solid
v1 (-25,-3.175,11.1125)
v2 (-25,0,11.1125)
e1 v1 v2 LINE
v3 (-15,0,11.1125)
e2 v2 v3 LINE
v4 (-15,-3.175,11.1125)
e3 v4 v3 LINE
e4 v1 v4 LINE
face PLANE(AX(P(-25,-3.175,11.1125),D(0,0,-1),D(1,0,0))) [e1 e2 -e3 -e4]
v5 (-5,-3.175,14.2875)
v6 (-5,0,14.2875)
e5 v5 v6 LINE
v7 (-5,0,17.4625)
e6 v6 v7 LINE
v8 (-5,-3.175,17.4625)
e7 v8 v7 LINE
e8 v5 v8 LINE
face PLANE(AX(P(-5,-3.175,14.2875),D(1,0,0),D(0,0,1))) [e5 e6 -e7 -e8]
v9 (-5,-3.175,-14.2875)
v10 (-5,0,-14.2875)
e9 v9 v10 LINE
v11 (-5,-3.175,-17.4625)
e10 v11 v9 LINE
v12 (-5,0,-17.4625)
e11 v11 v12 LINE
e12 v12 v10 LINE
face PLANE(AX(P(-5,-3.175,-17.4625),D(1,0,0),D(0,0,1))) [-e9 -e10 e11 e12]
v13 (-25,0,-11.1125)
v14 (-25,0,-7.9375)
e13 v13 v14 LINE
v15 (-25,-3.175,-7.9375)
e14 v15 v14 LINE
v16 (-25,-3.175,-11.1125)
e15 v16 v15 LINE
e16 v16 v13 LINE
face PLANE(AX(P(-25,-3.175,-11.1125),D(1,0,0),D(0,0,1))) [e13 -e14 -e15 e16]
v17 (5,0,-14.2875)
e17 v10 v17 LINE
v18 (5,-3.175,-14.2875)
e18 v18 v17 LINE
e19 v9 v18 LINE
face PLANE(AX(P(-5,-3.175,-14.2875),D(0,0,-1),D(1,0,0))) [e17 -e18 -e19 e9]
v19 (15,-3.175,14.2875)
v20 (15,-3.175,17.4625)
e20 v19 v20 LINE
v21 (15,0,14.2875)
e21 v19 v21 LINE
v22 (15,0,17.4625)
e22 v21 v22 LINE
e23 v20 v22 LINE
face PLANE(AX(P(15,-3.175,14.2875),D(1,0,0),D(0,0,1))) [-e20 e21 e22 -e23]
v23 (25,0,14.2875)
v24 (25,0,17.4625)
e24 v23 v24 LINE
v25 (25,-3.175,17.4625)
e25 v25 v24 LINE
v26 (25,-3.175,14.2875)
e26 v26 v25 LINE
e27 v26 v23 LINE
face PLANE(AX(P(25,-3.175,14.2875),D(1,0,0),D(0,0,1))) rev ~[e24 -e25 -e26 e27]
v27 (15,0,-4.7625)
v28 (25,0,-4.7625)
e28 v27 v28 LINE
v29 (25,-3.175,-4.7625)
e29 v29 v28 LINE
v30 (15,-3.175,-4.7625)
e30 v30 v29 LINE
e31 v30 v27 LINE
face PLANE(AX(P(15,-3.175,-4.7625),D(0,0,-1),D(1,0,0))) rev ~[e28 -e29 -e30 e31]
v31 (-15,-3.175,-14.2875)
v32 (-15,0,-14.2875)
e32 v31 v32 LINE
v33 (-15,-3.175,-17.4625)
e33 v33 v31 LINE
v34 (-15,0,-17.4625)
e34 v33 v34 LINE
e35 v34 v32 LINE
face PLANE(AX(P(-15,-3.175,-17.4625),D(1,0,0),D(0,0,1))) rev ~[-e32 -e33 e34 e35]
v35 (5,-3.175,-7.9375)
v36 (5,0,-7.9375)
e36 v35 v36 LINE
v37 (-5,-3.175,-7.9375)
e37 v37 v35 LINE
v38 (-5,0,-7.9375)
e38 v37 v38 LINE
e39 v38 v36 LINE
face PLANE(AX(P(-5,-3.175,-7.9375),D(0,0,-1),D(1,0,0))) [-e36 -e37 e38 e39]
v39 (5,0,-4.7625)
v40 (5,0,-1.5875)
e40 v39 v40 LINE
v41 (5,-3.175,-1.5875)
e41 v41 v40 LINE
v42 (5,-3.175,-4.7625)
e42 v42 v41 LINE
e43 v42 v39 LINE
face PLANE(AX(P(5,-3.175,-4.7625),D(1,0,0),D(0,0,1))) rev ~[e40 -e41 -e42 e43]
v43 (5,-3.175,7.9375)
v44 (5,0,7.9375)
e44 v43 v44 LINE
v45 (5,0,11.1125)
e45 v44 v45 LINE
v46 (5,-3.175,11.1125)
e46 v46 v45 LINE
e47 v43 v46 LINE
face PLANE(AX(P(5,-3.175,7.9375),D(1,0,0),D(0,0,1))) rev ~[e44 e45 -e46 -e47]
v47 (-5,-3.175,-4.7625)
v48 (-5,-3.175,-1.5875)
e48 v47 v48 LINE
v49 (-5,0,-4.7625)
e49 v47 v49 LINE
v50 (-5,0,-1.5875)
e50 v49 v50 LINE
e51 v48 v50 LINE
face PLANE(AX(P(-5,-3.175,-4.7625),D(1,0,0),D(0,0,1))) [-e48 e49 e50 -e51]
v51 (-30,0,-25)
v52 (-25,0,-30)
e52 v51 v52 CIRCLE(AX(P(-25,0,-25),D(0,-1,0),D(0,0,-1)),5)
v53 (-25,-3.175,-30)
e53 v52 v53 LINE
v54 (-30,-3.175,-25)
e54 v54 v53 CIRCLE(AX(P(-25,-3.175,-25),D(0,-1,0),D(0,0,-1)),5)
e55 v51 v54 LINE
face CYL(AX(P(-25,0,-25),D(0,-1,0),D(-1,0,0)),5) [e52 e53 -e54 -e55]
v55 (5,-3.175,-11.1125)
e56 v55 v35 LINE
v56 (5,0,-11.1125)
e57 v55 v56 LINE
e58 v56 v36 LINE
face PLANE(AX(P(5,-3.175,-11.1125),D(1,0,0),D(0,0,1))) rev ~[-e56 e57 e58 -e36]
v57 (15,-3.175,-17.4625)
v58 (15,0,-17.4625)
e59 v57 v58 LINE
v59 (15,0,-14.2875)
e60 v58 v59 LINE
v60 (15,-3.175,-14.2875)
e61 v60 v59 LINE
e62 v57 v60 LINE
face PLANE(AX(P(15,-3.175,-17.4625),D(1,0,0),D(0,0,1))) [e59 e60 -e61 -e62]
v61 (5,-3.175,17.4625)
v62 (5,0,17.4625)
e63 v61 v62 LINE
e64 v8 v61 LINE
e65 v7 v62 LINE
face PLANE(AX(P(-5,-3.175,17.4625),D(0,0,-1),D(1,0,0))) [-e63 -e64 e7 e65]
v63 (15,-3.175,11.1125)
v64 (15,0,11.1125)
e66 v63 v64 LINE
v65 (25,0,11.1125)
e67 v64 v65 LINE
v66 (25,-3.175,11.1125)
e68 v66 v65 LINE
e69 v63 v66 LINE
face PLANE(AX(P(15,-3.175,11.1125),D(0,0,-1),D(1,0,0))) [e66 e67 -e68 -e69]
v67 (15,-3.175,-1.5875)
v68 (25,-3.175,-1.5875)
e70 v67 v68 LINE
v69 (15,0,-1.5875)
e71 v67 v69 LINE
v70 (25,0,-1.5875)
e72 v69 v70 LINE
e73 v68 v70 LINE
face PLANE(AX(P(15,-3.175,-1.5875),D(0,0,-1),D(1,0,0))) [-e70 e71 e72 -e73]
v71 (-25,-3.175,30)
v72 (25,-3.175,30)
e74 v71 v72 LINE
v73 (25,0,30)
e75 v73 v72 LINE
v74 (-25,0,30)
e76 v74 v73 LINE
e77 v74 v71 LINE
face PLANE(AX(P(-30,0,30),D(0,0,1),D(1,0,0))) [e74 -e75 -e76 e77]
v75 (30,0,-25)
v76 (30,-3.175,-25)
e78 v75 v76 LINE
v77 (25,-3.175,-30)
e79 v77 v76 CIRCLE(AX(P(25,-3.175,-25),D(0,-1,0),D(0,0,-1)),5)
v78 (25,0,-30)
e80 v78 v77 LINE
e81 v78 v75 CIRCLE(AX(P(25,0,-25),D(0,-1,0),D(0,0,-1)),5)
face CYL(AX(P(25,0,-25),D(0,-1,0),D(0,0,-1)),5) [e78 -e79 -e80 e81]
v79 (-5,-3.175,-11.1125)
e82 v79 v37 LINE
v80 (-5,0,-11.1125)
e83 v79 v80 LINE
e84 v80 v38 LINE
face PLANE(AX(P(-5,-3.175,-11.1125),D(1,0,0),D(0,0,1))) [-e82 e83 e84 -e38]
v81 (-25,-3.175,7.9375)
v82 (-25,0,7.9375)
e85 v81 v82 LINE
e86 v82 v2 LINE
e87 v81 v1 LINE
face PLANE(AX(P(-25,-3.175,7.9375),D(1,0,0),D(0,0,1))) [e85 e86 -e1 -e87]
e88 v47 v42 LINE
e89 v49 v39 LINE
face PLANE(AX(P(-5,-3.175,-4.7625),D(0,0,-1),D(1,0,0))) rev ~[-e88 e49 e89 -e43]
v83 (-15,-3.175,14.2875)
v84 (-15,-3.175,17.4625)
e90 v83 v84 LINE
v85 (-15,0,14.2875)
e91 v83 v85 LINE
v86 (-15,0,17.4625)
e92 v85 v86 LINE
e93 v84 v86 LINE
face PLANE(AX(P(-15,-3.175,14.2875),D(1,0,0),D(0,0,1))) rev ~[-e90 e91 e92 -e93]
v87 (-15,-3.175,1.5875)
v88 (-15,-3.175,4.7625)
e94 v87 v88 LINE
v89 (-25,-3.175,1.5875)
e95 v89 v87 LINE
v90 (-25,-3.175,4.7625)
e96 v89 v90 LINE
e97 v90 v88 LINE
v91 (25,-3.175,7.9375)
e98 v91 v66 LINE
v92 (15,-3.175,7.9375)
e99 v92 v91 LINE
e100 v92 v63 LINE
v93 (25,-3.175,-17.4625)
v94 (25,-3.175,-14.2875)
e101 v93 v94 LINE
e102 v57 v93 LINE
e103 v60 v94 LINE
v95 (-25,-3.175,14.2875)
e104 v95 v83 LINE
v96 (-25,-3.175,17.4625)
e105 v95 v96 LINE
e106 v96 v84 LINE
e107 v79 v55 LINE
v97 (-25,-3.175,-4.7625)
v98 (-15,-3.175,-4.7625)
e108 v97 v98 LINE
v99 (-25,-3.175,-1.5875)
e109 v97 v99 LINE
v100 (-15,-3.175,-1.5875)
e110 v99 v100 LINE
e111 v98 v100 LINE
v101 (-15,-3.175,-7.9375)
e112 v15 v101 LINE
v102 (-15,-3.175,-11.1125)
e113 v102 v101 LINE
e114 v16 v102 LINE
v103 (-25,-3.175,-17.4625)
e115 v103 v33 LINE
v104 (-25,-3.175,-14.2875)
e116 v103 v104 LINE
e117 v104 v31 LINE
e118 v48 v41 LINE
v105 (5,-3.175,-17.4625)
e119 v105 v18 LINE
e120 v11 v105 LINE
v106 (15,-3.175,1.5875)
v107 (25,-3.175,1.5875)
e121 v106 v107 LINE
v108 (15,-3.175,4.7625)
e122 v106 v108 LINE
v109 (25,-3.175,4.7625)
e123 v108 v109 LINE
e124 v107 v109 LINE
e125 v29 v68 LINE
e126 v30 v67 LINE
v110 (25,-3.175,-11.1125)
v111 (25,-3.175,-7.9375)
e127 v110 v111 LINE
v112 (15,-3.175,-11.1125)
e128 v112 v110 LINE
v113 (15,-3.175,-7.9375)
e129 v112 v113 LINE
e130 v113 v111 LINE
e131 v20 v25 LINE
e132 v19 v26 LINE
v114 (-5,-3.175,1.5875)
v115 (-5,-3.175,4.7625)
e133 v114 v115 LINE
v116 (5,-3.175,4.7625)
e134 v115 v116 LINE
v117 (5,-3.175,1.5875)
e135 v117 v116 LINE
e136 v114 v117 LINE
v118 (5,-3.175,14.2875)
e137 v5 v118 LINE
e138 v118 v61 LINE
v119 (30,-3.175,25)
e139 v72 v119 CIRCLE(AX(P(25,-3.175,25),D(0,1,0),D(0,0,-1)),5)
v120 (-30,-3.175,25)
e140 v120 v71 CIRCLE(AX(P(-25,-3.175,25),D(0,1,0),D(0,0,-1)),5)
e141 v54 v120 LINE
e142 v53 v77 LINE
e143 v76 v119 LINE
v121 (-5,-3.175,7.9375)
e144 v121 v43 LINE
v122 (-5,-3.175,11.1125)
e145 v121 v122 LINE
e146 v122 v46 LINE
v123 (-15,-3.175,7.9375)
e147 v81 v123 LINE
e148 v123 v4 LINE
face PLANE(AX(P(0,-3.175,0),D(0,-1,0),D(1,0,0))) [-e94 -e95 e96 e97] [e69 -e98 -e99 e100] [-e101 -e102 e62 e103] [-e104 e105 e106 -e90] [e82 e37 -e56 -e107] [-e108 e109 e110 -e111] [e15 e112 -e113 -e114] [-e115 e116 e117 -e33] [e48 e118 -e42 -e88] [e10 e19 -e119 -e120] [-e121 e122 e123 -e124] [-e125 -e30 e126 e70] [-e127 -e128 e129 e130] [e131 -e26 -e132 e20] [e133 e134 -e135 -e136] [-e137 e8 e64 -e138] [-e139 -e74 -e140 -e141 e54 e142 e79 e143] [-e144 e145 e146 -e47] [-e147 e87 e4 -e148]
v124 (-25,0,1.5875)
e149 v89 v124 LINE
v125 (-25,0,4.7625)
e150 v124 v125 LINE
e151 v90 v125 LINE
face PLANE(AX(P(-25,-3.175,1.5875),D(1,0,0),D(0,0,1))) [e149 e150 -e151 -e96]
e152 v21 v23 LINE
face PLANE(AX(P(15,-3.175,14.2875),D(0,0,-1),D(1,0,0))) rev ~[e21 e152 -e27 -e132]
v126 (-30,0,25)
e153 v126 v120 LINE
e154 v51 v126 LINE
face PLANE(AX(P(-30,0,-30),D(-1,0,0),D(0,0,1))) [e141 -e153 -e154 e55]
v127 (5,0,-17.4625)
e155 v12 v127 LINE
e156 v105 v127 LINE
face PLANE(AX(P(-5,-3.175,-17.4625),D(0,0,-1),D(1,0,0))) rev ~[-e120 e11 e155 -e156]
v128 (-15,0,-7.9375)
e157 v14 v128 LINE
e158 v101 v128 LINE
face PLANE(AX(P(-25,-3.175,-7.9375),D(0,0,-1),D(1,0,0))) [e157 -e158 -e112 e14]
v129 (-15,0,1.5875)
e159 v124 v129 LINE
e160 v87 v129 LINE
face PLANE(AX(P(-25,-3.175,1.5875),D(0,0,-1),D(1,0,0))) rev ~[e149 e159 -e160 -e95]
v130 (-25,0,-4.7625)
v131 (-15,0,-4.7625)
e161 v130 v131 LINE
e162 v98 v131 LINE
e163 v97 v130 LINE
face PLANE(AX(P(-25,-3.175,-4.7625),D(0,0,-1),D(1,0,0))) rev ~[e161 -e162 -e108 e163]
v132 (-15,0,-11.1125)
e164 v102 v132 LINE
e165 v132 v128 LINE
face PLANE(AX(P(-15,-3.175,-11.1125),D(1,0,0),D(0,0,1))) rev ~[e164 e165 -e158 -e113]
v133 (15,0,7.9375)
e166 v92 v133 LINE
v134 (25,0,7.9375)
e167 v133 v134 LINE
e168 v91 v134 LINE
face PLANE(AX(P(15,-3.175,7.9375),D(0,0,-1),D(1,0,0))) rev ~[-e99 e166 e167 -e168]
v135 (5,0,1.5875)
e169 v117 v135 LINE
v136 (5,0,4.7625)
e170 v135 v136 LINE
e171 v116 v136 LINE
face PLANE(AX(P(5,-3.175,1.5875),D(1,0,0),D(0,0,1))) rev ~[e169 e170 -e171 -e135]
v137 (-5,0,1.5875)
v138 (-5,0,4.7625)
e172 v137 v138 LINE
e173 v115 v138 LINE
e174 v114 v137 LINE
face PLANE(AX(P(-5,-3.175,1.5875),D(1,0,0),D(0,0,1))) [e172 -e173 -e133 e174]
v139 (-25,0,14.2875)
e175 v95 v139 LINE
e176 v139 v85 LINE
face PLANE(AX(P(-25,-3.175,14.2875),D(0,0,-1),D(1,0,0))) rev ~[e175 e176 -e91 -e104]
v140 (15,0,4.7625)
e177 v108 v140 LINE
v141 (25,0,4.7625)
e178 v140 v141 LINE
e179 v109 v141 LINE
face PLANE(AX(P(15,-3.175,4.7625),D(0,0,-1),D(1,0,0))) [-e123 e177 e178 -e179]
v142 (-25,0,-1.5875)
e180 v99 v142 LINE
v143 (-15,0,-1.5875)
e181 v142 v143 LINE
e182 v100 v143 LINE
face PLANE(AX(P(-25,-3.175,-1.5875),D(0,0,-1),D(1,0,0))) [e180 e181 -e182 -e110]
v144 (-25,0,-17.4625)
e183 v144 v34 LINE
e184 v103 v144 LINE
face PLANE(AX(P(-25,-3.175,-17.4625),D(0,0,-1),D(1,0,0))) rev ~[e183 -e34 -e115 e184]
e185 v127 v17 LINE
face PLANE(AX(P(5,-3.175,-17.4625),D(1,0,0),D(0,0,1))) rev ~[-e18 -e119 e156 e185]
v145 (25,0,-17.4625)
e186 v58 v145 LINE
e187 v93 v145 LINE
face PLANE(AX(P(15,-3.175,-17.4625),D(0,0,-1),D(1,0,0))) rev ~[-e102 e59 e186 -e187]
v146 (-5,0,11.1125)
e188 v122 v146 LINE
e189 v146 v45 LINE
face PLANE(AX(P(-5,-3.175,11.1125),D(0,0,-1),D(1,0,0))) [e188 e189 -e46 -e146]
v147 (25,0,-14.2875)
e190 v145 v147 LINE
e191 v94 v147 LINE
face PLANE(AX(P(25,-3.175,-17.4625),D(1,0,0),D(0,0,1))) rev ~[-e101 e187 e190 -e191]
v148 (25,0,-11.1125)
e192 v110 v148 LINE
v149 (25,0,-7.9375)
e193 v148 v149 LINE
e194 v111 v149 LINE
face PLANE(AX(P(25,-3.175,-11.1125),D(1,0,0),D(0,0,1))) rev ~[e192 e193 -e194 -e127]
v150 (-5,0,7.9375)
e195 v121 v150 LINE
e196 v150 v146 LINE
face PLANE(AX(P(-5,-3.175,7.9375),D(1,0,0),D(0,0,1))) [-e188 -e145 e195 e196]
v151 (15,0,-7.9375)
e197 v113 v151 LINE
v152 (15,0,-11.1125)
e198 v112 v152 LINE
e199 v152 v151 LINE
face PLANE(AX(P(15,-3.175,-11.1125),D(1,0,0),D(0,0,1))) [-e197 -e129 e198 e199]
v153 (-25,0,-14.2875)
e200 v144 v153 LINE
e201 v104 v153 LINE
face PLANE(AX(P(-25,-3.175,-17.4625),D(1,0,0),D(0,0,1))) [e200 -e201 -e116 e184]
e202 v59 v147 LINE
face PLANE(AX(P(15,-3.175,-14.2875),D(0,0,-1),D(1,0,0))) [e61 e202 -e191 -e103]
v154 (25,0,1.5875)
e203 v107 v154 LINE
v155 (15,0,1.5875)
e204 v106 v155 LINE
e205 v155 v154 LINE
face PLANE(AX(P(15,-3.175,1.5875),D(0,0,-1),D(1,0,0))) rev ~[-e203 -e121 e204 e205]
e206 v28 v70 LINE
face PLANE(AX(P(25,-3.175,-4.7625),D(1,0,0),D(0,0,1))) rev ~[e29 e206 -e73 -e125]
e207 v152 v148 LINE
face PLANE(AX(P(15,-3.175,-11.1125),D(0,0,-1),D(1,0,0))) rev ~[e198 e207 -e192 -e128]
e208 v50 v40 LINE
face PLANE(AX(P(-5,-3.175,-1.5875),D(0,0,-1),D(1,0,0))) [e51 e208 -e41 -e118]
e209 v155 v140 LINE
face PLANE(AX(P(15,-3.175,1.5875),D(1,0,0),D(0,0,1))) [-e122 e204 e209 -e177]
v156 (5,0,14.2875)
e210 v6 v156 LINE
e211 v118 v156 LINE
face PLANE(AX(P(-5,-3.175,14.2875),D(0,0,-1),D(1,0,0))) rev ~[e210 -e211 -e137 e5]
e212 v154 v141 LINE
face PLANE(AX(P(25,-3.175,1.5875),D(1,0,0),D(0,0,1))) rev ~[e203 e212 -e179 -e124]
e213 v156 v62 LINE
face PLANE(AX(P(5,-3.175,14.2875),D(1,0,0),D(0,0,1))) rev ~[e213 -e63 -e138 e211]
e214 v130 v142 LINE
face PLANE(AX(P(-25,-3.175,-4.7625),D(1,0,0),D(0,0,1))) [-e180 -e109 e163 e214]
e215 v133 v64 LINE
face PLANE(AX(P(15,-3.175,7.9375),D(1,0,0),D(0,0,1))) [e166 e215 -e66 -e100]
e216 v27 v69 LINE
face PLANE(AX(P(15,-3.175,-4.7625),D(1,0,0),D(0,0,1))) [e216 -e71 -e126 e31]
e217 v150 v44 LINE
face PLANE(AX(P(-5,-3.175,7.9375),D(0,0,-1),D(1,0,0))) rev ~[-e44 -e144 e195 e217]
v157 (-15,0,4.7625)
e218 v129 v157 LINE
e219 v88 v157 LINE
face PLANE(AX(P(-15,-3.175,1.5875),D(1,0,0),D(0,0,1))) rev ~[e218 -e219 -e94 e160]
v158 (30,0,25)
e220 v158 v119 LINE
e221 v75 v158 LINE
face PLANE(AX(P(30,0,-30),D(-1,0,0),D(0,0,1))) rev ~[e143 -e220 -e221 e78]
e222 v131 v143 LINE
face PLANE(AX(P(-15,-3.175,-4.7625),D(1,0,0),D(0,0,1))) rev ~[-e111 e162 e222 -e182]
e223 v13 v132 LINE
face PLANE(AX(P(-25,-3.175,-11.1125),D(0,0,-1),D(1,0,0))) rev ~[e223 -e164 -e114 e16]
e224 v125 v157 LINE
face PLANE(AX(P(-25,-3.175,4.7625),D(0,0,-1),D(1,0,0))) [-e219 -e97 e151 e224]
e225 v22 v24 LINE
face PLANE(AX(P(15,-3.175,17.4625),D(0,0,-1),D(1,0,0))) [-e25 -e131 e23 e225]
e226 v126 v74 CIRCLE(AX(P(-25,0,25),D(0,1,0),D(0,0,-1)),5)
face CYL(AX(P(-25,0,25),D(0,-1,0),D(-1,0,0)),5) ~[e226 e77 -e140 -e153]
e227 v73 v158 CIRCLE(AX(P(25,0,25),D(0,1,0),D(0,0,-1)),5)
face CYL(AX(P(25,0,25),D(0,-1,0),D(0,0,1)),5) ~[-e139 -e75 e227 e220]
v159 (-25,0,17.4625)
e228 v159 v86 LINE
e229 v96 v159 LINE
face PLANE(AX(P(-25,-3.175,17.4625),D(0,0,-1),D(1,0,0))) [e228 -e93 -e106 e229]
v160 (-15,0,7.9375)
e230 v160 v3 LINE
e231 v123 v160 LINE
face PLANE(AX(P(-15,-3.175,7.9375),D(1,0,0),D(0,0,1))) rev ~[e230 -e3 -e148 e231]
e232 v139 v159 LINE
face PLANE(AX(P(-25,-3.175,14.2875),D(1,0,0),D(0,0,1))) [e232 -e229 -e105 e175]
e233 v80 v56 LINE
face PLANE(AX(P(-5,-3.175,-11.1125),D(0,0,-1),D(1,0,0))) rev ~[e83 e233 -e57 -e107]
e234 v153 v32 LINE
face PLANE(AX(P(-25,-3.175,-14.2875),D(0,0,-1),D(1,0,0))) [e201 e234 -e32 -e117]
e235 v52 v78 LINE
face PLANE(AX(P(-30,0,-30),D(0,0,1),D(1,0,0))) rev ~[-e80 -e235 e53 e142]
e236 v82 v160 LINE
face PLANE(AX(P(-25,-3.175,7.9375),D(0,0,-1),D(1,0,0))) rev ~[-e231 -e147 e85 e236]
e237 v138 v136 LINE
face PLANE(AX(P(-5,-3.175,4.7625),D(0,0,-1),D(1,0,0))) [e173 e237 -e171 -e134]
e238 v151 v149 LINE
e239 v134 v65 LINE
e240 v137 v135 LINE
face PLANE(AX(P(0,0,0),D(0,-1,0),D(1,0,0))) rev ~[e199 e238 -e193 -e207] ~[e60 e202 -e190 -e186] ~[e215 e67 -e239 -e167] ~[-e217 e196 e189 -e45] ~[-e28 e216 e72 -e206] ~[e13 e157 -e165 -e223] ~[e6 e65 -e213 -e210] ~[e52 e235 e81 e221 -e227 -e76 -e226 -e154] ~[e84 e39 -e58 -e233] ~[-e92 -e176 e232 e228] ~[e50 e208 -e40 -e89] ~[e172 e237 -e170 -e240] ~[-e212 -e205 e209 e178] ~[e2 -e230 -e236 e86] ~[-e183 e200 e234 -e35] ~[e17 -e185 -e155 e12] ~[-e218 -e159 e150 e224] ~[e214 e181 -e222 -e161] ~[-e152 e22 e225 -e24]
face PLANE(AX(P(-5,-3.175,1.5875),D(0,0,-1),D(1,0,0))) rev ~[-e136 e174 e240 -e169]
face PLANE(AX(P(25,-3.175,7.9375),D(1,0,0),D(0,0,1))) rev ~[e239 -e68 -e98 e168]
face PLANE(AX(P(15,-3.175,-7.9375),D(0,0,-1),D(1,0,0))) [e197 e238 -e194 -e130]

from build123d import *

# Parameters (mm, degrees)
F0_W     = 60
F0_H     = 60
F1_DEPTH = 3.175
F2_W     = 10
F2_H     = 3.175
F3_DEPTH = 3.176
F4_R     = 5


# Not quite as in the source:
# - a length typed as a fraction of an inch, garbled in the dataset ("3 / 203.2 mm" for 3/8 in), is restored


with BuildPart() as f1:
    # F0 (on Front) → F1 (new body)
    with BuildSketch(Plane.XZ):
        Rectangle(F0_W, F0_H)
    extrude(amount=F1_DEPTH)

    # F2 (on face) → F3 (cut, through all)
    with BuildSketch(Plane.XZ.offset(3.175)):
        with Locations((-20, -15.875)):
            Rectangle(F2_W, F2_H)
        with Locations((0, -15.875)):
            Rectangle(F2_W, F2_H)
        with Locations((20, -15.875)):
            Rectangle(F2_W, F2_H)
        with Locations((-20, -9.525)):
            Rectangle(F2_W, F2_H)
        with Locations((0, -9.525)):
            Rectangle(F2_W, F2_H)
        with Locations((20, -9.525)):
            Rectangle(F2_W, F2_H)
        with Locations((-20, -3.175)):
            Rectangle(F2_W, F2_H)
        with Locations((0, -3.175)):
            Rectangle(F2_W, F2_H)
        with Locations((20, -3.175)):
            Rectangle(F2_W, F2_H)
        with Locations((-20, 3.175)):
            Rectangle(F2_W, F2_H)
        with Locations((0, 3.175)):
            Rectangle(F2_W, F2_H)
        with Locations((20, 3.175)):
            Rectangle(F2_W, F2_H)
        with Locations((-20, 9.525)):
            Rectangle(F2_W, F2_H)
        with Locations((0, 9.525)):
            Rectangle(F2_W, F2_H)
        with Locations((20, 9.525)):
            Rectangle(F2_W, F2_H)
        with Locations((-20, 15.875)):
            Rectangle(F2_W, F2_H)
        with Locations((0, 15.875)):
            Rectangle(F2_W, F2_H)
        with Locations((20, 15.875)):
            Rectangle(F2_W, F2_H)
    extrude(amount=-F3_DEPTH, mode=Mode.SUBTRACT)

    # F4
    f4_edges = [f1.edges().sort_by_distance(p)[0] for p in [
        (-30, -1.5875, 30),
        (30, -1.5875, 30),
        (-30, -1.5875, -30),
        (30, -1.5875, -30),
    ]]
    fillet(f4_edges, radius=F4_R)


solid = f1.part
